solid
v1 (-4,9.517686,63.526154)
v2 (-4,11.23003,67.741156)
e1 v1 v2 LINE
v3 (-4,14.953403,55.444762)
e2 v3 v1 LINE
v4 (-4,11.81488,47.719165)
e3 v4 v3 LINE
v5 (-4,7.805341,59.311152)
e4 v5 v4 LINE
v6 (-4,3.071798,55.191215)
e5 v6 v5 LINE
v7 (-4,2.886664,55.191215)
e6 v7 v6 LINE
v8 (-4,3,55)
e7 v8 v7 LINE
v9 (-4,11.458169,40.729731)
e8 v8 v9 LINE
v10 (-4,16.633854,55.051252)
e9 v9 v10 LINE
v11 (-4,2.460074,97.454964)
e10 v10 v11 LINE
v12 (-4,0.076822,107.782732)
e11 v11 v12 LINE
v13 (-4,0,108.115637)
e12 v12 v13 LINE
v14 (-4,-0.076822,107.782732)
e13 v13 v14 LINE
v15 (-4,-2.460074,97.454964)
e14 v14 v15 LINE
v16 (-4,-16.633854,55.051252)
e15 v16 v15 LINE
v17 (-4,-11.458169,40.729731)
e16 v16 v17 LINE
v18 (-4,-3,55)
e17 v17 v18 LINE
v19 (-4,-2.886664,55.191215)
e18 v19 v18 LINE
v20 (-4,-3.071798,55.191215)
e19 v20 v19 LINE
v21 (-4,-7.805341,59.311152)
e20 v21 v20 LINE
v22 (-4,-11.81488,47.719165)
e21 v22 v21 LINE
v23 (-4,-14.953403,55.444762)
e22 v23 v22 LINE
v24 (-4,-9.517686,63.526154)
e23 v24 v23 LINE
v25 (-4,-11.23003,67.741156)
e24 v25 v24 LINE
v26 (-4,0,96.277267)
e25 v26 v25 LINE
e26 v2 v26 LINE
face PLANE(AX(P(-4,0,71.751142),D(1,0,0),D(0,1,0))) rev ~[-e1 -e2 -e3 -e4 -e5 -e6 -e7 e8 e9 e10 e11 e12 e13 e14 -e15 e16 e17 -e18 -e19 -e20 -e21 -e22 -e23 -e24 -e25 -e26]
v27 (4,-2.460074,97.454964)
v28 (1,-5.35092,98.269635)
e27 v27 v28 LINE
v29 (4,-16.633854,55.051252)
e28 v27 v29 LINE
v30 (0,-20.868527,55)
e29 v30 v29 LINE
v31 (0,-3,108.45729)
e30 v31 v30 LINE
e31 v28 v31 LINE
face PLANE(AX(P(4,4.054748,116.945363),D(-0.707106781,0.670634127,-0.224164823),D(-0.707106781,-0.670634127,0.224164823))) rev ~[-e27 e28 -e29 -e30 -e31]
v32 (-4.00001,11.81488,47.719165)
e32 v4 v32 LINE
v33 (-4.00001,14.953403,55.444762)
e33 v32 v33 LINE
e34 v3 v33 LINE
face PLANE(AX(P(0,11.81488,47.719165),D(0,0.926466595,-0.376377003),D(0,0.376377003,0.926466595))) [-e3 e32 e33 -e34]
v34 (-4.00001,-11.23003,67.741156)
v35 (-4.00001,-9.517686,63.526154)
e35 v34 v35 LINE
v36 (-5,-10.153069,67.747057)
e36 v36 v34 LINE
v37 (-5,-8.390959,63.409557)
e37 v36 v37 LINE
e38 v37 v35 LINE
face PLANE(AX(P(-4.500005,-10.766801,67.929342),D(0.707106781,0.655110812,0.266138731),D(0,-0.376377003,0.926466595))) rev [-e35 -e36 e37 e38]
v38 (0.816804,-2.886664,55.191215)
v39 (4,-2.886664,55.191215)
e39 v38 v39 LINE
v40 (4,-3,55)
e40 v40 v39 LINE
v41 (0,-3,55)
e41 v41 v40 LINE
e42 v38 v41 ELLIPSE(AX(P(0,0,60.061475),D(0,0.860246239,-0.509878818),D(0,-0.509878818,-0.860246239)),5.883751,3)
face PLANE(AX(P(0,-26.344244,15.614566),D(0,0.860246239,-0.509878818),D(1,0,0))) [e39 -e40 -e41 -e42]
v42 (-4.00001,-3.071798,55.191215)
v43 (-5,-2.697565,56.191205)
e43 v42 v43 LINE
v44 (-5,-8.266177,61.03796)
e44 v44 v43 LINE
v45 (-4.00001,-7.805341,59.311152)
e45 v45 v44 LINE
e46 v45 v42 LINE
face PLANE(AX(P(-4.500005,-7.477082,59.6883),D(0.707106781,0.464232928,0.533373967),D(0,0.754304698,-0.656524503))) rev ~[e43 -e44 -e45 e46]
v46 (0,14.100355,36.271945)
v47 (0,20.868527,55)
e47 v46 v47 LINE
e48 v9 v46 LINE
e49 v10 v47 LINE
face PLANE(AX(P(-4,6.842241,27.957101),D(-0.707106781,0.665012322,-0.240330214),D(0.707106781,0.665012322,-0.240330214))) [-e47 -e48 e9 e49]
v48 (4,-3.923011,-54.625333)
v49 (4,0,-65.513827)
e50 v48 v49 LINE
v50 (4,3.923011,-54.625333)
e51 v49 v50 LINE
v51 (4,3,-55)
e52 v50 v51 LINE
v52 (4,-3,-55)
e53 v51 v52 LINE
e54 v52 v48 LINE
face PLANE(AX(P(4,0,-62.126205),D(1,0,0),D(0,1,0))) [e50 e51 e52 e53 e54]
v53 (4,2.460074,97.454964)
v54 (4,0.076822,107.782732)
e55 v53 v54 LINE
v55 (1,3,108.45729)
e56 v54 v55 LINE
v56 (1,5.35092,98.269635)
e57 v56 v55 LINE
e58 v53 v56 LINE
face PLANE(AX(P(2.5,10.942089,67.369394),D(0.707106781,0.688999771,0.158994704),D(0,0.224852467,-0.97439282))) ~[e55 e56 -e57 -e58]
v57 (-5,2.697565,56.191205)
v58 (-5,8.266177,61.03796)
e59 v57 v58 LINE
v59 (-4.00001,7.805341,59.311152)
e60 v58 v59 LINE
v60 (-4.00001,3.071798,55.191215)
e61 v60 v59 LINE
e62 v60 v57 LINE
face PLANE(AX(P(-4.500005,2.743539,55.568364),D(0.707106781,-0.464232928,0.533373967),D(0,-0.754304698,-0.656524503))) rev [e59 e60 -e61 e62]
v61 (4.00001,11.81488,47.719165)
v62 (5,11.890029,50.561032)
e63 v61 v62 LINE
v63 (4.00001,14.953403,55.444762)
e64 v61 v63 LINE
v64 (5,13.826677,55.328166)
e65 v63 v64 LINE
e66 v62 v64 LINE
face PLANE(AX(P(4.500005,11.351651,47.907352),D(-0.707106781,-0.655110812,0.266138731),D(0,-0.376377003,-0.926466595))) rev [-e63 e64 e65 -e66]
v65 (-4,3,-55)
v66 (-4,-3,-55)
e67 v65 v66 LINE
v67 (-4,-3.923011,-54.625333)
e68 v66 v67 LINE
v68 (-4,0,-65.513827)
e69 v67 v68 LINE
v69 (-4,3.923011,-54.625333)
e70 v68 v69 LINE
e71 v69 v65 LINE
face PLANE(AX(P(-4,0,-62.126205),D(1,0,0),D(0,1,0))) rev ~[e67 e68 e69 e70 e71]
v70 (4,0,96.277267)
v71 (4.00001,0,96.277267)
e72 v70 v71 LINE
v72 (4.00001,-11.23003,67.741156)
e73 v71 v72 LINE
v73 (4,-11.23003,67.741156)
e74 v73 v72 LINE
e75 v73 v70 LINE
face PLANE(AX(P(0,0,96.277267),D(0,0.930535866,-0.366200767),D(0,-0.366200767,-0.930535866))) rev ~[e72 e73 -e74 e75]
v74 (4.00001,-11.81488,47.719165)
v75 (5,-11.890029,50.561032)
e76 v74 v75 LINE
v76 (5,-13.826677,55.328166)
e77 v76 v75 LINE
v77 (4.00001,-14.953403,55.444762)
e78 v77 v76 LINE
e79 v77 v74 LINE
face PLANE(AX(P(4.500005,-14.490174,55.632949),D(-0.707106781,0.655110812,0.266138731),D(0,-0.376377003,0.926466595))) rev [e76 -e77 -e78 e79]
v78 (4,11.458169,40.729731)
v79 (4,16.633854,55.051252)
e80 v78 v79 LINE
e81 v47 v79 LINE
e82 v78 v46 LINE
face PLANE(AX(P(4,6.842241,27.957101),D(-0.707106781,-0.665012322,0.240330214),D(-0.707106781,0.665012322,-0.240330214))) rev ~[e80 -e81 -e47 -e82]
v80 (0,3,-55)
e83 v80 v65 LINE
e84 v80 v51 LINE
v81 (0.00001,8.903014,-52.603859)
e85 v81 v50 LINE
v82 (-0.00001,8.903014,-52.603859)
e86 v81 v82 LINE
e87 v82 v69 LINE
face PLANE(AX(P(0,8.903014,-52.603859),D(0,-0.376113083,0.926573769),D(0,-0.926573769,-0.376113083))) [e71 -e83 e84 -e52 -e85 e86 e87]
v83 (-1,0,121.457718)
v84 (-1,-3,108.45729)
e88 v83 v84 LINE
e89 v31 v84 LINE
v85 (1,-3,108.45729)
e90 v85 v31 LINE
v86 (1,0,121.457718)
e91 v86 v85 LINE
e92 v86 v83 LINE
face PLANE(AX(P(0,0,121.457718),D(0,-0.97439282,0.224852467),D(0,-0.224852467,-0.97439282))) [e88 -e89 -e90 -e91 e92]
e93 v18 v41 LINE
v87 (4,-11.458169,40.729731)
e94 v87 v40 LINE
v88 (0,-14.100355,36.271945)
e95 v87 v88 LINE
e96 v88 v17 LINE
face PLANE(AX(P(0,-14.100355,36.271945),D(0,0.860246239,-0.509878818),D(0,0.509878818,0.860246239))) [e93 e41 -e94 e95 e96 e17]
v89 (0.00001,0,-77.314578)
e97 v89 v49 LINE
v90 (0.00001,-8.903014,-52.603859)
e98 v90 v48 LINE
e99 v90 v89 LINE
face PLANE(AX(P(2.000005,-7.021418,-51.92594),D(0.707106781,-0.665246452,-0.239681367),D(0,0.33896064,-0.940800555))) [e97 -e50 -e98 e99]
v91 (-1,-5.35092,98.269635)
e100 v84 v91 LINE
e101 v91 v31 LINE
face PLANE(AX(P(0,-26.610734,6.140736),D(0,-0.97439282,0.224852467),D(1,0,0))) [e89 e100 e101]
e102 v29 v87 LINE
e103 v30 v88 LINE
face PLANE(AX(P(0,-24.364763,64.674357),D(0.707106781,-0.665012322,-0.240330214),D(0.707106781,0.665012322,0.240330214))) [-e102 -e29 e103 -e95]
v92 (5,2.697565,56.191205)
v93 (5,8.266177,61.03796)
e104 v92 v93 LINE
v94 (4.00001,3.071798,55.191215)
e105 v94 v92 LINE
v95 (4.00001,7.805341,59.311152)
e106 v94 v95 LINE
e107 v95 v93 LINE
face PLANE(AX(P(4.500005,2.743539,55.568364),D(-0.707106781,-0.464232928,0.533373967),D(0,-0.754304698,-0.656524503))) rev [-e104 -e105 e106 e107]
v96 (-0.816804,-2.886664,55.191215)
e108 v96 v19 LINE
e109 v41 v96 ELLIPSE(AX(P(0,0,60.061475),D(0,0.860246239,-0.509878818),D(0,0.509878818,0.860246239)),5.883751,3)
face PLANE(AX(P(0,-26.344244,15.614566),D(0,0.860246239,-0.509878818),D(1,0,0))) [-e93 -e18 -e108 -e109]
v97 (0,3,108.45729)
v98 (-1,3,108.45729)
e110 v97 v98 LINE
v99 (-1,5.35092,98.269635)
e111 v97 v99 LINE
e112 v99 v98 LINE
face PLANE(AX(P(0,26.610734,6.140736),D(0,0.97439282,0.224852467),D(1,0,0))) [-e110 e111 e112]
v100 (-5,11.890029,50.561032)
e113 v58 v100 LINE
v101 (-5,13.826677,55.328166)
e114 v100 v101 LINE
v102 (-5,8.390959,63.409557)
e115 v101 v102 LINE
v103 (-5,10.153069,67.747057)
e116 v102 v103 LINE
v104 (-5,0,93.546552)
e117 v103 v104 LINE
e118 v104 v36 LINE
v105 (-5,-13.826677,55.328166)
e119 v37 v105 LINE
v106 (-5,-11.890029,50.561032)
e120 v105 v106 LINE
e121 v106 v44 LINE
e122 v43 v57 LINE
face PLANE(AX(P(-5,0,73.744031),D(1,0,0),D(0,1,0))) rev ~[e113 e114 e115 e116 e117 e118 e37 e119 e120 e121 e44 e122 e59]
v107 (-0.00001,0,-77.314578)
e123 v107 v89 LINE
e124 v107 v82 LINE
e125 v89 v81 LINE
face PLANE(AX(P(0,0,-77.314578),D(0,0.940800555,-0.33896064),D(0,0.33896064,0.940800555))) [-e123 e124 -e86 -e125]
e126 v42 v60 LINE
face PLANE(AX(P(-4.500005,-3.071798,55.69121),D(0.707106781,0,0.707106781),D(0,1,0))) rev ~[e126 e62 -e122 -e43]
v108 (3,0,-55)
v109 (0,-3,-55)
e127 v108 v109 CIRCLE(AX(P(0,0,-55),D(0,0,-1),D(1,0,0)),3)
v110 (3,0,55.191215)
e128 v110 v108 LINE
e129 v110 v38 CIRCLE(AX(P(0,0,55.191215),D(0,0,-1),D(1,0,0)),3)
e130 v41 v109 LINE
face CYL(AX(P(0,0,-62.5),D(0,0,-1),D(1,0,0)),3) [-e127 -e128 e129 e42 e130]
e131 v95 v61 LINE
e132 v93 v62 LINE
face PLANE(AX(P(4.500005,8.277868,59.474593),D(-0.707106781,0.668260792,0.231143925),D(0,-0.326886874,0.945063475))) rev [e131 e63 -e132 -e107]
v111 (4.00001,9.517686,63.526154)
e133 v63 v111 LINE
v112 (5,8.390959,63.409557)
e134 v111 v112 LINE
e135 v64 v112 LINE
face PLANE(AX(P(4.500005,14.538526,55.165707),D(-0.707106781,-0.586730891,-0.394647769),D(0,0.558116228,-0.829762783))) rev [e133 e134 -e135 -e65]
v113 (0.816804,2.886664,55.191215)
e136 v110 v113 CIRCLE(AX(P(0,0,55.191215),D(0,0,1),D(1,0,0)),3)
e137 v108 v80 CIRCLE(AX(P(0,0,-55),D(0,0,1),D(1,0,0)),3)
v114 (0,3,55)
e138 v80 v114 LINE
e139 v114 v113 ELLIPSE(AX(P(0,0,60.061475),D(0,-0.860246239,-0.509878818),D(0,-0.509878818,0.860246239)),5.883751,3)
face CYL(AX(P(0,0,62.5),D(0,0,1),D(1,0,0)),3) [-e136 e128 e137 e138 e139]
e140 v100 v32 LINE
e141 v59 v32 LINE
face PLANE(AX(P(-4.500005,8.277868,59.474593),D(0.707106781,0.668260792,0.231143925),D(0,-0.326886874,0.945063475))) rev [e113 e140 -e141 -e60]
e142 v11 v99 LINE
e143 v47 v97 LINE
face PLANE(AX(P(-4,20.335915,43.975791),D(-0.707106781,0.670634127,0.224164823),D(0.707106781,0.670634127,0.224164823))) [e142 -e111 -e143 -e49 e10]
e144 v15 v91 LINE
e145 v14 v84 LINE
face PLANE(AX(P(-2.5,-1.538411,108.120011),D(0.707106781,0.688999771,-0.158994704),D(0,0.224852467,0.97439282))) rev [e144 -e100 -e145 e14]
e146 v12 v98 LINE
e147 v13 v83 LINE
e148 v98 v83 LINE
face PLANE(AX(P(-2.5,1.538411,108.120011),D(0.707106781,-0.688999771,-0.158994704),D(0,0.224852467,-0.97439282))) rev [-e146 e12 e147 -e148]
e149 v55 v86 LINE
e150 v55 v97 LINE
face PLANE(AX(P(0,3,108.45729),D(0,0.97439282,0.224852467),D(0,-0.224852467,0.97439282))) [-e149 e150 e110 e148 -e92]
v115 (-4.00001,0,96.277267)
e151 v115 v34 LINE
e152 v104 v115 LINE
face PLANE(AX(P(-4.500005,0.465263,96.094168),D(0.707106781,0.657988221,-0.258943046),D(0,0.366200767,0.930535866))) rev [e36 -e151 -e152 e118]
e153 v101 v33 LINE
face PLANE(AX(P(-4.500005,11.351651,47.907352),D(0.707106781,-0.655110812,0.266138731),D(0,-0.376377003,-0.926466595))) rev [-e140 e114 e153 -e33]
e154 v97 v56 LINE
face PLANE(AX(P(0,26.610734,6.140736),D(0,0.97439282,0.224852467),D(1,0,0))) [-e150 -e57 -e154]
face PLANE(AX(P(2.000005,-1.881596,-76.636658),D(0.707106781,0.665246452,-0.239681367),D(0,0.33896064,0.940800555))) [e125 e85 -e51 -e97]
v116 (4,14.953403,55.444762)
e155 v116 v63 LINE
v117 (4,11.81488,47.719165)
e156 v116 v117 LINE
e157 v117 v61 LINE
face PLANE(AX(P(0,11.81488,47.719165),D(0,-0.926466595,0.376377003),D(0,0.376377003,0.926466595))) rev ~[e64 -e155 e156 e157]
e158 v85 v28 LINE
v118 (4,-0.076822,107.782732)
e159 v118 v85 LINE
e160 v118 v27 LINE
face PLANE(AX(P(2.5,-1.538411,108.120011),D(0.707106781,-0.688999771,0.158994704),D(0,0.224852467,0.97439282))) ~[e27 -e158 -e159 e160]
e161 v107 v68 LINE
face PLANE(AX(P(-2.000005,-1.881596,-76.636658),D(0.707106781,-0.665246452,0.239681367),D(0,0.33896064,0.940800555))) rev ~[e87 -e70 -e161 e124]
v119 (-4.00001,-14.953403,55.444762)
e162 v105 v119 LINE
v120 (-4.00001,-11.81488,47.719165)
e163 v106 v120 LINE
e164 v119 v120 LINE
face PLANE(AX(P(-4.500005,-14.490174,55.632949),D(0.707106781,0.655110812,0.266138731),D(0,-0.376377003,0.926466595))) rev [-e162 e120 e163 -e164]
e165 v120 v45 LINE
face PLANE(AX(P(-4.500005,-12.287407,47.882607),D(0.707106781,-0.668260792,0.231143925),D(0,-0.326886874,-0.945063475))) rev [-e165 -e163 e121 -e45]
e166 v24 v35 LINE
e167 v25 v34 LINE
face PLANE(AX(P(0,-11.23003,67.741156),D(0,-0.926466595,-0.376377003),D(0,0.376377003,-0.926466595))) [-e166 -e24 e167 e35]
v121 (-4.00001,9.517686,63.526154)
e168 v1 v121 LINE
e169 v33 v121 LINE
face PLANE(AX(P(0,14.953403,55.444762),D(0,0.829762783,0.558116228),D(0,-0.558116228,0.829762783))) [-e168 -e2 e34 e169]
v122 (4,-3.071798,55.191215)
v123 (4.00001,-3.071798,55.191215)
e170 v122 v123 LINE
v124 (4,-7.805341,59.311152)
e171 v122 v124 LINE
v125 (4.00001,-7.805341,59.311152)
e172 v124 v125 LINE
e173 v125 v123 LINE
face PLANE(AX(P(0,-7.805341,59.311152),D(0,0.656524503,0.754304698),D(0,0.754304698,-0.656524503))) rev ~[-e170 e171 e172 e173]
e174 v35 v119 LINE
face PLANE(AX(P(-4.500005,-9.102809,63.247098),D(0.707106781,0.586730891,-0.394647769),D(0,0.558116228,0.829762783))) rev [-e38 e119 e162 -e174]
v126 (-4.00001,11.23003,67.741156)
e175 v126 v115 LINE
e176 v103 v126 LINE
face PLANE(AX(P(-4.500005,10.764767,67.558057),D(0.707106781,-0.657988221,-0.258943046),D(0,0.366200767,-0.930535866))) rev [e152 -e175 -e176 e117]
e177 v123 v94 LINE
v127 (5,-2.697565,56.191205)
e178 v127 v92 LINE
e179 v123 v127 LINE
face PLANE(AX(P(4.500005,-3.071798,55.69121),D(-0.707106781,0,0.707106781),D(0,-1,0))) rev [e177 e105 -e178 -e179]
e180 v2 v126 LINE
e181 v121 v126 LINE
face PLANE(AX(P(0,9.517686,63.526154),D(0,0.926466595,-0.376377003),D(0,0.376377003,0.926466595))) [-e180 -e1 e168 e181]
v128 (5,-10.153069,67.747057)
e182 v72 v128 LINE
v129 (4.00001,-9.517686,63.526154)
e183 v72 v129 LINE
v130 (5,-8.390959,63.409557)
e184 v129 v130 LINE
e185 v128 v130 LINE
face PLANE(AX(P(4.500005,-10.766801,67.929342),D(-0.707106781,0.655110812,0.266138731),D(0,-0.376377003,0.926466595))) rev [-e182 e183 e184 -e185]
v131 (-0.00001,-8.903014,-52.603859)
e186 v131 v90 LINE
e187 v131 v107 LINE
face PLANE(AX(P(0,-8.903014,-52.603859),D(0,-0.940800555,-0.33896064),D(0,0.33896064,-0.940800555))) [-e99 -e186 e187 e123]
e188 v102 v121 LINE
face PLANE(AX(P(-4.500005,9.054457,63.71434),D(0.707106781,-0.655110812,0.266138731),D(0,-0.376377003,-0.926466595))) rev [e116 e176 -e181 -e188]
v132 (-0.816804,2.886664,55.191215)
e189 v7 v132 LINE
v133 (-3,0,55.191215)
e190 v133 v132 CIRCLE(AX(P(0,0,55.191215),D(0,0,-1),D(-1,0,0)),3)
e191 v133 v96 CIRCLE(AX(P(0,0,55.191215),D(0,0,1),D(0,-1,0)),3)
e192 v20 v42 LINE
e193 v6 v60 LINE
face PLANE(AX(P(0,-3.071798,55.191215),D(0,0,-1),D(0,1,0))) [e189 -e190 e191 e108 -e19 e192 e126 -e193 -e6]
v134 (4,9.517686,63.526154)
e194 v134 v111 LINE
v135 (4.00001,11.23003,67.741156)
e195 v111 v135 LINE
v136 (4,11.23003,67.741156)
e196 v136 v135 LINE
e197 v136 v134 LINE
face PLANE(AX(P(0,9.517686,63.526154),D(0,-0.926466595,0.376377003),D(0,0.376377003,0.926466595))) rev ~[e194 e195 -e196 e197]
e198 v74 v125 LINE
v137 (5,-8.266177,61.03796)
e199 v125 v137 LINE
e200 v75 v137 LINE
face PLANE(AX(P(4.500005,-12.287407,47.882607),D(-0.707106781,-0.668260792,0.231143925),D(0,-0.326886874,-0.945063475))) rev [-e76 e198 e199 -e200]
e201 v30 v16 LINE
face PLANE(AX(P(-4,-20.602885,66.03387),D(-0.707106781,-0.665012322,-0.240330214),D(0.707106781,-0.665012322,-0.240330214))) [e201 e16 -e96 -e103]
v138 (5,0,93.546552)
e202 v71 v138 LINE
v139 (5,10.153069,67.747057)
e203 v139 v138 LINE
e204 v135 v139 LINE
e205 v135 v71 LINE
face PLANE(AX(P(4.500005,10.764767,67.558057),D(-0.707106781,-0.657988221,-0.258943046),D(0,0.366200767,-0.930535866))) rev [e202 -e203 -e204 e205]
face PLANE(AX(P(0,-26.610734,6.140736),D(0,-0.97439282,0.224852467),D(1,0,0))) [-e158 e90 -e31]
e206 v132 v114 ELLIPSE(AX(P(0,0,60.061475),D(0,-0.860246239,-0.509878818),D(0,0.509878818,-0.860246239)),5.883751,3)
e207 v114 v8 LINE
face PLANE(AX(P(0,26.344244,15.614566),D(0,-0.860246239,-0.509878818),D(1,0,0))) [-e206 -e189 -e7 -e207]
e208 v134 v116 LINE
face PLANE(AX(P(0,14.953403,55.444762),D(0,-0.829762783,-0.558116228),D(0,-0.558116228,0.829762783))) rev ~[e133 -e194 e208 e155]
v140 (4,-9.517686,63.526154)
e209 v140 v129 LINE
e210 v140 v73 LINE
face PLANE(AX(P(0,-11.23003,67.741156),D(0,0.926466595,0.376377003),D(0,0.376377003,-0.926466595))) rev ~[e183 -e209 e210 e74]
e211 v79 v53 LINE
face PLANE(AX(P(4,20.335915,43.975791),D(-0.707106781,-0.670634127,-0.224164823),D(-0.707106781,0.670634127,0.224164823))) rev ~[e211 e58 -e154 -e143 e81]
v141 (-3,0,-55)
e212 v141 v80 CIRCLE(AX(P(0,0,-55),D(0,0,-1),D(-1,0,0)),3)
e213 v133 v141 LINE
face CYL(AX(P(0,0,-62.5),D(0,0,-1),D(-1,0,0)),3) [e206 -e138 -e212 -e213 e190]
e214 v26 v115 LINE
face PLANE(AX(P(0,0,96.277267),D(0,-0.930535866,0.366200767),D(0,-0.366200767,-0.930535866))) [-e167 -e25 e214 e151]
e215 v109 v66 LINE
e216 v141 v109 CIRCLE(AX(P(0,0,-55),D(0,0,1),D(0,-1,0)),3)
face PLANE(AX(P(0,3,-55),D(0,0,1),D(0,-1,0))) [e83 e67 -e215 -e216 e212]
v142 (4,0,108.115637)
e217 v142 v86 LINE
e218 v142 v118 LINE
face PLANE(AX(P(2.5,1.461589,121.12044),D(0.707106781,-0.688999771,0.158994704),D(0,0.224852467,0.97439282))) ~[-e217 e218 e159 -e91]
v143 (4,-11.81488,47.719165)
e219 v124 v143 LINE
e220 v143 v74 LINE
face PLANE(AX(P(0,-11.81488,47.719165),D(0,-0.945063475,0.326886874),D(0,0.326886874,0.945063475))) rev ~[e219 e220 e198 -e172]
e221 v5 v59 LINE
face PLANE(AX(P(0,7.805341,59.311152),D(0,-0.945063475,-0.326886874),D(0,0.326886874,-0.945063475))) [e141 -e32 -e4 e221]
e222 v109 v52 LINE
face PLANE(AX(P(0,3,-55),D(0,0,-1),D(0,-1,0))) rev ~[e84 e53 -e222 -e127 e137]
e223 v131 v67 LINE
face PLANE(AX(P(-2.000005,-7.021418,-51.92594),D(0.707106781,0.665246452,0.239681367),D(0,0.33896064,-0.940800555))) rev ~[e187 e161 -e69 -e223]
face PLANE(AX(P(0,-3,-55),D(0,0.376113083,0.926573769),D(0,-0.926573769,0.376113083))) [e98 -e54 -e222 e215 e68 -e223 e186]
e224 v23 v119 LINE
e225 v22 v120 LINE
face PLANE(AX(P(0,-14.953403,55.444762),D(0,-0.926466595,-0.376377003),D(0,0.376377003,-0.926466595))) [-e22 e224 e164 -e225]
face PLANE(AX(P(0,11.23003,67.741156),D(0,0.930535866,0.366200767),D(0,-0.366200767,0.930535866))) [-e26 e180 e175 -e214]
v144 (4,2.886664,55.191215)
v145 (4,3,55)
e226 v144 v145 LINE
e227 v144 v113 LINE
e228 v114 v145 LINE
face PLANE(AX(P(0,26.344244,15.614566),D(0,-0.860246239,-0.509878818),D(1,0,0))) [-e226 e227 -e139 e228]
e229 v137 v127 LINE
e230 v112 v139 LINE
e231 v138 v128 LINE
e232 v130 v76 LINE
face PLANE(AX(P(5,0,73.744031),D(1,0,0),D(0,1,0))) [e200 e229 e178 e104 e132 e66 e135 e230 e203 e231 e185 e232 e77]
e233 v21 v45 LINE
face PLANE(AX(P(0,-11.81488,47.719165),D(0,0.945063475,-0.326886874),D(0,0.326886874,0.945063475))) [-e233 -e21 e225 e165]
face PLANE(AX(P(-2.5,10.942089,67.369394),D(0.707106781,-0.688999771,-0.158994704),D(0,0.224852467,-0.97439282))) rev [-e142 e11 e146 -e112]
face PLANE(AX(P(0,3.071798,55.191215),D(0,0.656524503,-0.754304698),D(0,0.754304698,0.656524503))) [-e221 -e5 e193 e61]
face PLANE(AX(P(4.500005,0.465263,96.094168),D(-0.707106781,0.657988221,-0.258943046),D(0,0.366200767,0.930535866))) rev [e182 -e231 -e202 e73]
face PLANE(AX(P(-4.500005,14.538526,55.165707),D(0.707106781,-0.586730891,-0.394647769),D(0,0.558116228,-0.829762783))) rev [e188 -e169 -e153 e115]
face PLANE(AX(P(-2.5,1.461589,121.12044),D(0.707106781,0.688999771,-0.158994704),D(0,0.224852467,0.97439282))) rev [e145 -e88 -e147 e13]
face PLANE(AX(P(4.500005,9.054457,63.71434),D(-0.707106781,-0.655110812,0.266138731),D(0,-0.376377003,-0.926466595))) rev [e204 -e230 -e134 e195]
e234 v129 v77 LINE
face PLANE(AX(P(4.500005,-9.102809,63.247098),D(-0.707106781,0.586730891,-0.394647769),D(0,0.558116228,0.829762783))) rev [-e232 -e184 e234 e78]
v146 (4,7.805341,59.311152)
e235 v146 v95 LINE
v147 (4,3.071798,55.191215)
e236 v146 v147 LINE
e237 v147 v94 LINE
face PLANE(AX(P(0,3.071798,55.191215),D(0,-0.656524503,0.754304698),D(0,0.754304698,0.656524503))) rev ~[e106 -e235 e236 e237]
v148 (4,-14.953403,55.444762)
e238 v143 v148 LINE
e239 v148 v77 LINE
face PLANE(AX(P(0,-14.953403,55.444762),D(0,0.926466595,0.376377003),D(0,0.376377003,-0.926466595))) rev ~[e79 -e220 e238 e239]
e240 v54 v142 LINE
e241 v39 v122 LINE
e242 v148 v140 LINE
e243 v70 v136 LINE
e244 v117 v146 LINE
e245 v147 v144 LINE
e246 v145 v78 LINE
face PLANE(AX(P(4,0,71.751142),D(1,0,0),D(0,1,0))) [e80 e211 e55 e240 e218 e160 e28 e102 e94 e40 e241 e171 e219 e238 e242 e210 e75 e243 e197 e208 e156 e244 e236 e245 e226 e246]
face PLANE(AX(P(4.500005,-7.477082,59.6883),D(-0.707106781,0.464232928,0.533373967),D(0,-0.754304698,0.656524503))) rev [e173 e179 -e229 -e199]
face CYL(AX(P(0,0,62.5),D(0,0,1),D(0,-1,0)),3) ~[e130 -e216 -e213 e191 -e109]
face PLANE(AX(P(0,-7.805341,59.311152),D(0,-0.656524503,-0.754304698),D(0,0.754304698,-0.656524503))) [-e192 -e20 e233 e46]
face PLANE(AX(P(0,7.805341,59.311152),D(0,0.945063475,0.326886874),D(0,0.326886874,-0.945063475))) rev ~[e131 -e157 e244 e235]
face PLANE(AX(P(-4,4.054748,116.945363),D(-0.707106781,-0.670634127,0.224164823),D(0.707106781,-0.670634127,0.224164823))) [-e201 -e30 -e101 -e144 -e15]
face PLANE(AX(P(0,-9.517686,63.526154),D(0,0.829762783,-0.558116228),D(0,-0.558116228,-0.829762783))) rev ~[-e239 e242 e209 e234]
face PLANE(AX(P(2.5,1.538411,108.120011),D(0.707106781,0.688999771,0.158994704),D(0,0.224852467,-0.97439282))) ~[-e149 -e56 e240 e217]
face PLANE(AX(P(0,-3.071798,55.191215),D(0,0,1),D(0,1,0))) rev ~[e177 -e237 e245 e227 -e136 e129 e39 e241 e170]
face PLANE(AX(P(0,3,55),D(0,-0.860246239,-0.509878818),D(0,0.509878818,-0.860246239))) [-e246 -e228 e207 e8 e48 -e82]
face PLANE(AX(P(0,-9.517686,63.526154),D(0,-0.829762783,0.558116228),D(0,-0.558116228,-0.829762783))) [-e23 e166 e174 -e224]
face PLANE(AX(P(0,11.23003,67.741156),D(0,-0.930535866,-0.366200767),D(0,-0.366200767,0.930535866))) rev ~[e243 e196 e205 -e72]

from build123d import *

# Parameters (mm, degrees)
F1_DEPTH     = 3
F2_DEPTH     = 3
F4_DEPTH     = 4
F5_DEPTH     = 4
F6_T1_DEPTH  = 40.486982059
F6_T3_DEPTH  = 40.486982059
F6_T8_DEPTH  = 76.9380455506
F6_T13_DEPTH = 76.9380455506
F6_T18_DEPTH = 76.9380455506
F6_T23_DEPTH = 76.9380455506
F6_T28_DEPTH = 26.5734639037
F6_T35_DEPTH = 26.5734639037
F7_SIZE      = 3
F8_T4_DEPTH  = 125
F8_T10_DEPTH = 125
F8_T16_DEPTH = 125
F8_T22_DEPTH = 125
F9_DEPTH     = 5
F10_DEPTH    = 5
F11_SIZE     = 0.99999
F12_DEPTH    = 4
F13_DEPTH    = 4
F14_SIZE     = 3.99999


# Not quite as in the source:
# - a fillet or chamfer that OpenCascade refuses, or shapes differently, is made with other operations: its cross-section is extruded or revolved along the edge and cut away or added
# - a fillet or chamfer is up to 0.001 mm smaller than in the source, because OpenCascade refuses the exact size


with BuildPart() as f1:
    # F0 (on Right) → F1 (new body)
    with BuildSketch(Plane.YZ):
        Polygon((-3, 55), (-3, 0), (-3, -55), (3, -55), (3, 0), (3, 55), align=None)
    extrude(amount=F1_DEPTH)

    # F0 (on Right) → F2 (join)
    with BuildSketch(Plane.YZ):
        Polygon((-3, 55), (-3, 0), (-3, -55), (3, -55), (3, 0), (3, 55), align=None)
    extrude(amount=-F2_DEPTH)

    # F0 (on Right) → F4 (join)
    with BuildSketch(Plane.YZ):
        Polygon((-14.1003550962, 36.2719446421), (-3, 55), (3, 55), (14.1003550962, 36.2719446421), (20.8685267717, 55), (3, 108.4572896361), (0, 121.4577183127), (-3, 108.4572896361), (-20.8685267717, 55), align=None)
    extrude(amount=F4_DEPTH)

    # F3 (on face) + F0 (on Right) → F5 (join)
    with BuildSketch(Plane.YZ):
        Polygon((-7.805341389, 59.3111515045), (-3.0717977788, 55.1912151277), (3.0717977788, 55.1912151277), (7.805341389, 59.3111515045), (9.517685743, 63.5261535645), (11.2300300971, 67.7411556244), (0, 96.2772667408), (-11.2300300971, 67.7411556244), (-9.517685743, 63.5261535645), align=None)
        Polygon((9.517685743, 63.5261535645), (7.805341389, 59.3111515045), (11.814879576, 47.7191654262), (14.9534028023, 55.4447621107), align=None)
    with BuildSketch(Plane.YZ):
        Polygon((-14.1003550962, 36.2719446421), (-3, 55), (3, 55), (14.1003550962, 36.2719446421), (20.8685267717, 55), (3, 108.4572896361), (0, 121.4577183127), (-3, 108.4572896361), (-20.8685267717, 55), align=None)
    extrude(amount=-F5_DEPTH)

    # F6: chamfer of 4 on 10 edges, made by hand

    # F6_s2 → F6_t1 (cut)
    with BuildSketch(Plane(origin=(0, -23.4873916457, 64.9914322573), x_dir=(1, 0, 0), z_dir=(0, 0.3398782487, -0.9404694445))):
        Polygon((0, 0.932908104), (4, -3.067091896), (4, 0.932908104), align=None)
        Polygon((-4, -3.067091896), (0, 0.932908104), (-4, 0.932908104), align=None)
    extrude(amount=F6_T1_DEPTH, mode=Mode.SUBTRACT)

    # F6_s4 → F6_t3 (cut)
    with BuildSketch(Plane(origin=(0, 9.7267470895, 26.9146627299), x_dir=(1, 0, 0), z_dir=(0, 0.3398782487, 0.9404694445))):
        Polygon((4, -3.067091896), (0, 0.932908104), (4, 0.932908104), align=None)
        Polygon((-4, -3.067091896), (0, 0.932908104), (-4, 0.932908104), align=None)
    extrude(amount=F6_T3_DEPTH, mode=Mode.SUBTRACT)


with BuildPart() as f6_tool6:
    # F6_s7 → F6_t8 (new body)
    with BuildSketch(Plane(origin=(0, -11.1782341891, 33.4419345425), x_dir=(1, 0, 0), z_dir=(0, -0.3170169324, 0.9484198778))):
        Polygon((4, 33.2280568939), (0, 37.2280568939), (4, 37.2280568939), align=None)
    extrude(amount=F6_T8_DEPTH)

    split(bisect_by=Plane(origin=(0, 26.6107337931, 6.1407360761), x_dir=(1, 0, 0), z_dir=(0, 0.9743928202, 0.224852467)), keep=Keep.TOP)


with BuildPart() as f1_1:
    add(f1.part)

    # F6_t5: cut F6_tool6
    add(f6_tool6.part, mode=Mode.SUBTRACT)


with BuildPart() as f6_tool11:
    # F6_s12 → F6_t13 (new body)
    with BuildSketch(Plane(origin=(0, 35.5688973771, 106.4115062996), x_dir=(1, 0, 0), z_dir=(0, -0.3170169324, -0.9484198778))):
        Polygon((4, 33.2280568939), (0, 37.2280568939), (4, 37.2280568939), align=None)
    extrude(amount=F6_T13_DEPTH)

    split(bisect_by=Plane(origin=(0, -26.6107337931, 6.1407360761), x_dir=(1, 0, 0), z_dir=(0, -0.9743928202, 0.224852467)), keep=Keep.TOP)


with BuildPart() as f1_2:
    add(f1_1.part)

    # F6_t10: cut F6_tool11
    add(f6_tool11.part, mode=Mode.SUBTRACT)


with BuildPart() as f6_tool16:
    # F6_s17 → F6_t18 (new body)
    with BuildSketch(Plane(origin=(0, 35.5688973771, 106.4115062996), x_dir=(1, 0, 0), z_dir=(0, -0.3170169324, -0.9484198778))):
        Polygon((-4, 33.2280568939), (0, 37.2280568939), (-4, 37.2280568939), align=None)
    extrude(amount=F6_T18_DEPTH)

    split(bisect_by=Plane(origin=(0, -26.6107337931, 6.1407360761), x_dir=(1, 0, 0), z_dir=(0, -0.9743928202, 0.224852467)), keep=Keep.TOP)


with BuildPart() as f1_3:
    add(f1_2.part)

    # F6_t15: cut F6_tool16
    add(f6_tool16.part, mode=Mode.SUBTRACT)


with BuildPart() as f6_tool21:
    # F6_s22 → F6_t23 (new body)
    with BuildSketch(Plane(origin=(0, -11.1782341891, 33.4419345425), x_dir=(1, 0, 0), z_dir=(0, -0.3170169324, 0.9484198778))):
        Polygon((-4, 33.2280568939), (0, 37.2280568939), (-4, 37.2280568939), align=None)
    extrude(amount=F6_T23_DEPTH)

    split(bisect_by=Plane(origin=(0, 26.6107337931, 6.1407360761), x_dir=(1, 0, 0), z_dir=(0, 0.9743928202, 0.224852467)), keep=Keep.TOP)


with BuildPart() as f1_4:
    add(f1_3.part)

    # F6_t20: cut F6_tool21
    add(f6_tool21.part, mode=Mode.SUBTRACT)


with BuildPart() as f6_tool26:
    # F6_s27 → F6_t28 (new body)
    with BuildSketch(Plane.XZ.offset(13.2867319519)):
        Polygon((0, 55), (-4, 59), (-4, 55), align=None)
    extrude(amount=-F6_T28_DEPTH)

    split(bisect_by=Plane.YZ.offset(-3), keep=Keep.BOTTOM)

    split(bisect_by=Plane(origin=(0, 26.3442442024, 15.6145664778), x_dir=(1, 0, 0), z_dir=(0, -0.8602462388, -0.5098788176)), keep=Keep.TOP)

    split(bisect_by=Plane(origin=(0, -26.3442442024, 15.6145664778), x_dir=(1, 0, 0), z_dir=(0, 0.8602462388, -0.5098788176)), keep=Keep.TOP)


with BuildPart() as f1_5:
    add(f1_4.part)

    # F6_t25: cut F6_tool26
    add(f6_tool26.part, mode=Mode.SUBTRACT)


with BuildPart() as f6_tool33:
    # F6_s34 → F6_t35 (new body)
    with BuildSketch(Plane.XZ.offset(13.2867319519)):
        Polygon((4, 59), (0, 55), (4, 55), align=None)
    extrude(amount=-F6_T35_DEPTH)

    split(bisect_by=Plane.YZ.offset(3), keep=Keep.TOP)

    split(bisect_by=Plane(origin=(0, 26.3442442024, 15.6145664778), x_dir=(1, 0, 0), z_dir=(0, -0.8602462388, -0.5098788176)), keep=Keep.TOP)

    split(bisect_by=Plane(origin=(0, -26.3442442024, 15.6145664778), x_dir=(1, 0, 0), z_dir=(0, 0.8602462388, -0.5098788176)), keep=Keep.TOP)


with BuildPart() as f1_6:
    add(f1_5.part)

    # F6_t32: cut F6_tool33
    add(f6_tool33.part, mode=Mode.SUBTRACT)

    # F7
    f7_edges = [f1_6.edges().sort_by_distance(p)[0] for p in [
        (4, 6.201839, 94.582196),
        (4, -6.201839, 94.582196),
        (-4, -6.201839, 94.582196),
        (-4, 6.201839, 94.582196),
    ]]
    chamfer(f7_edges, length=F7_SIZE)

    # F8: fillet of radius 3 on 4 edges, made by hand


with BuildPart() as f8_tool2:
    # F8_s3 → F8_t4 (new body)
    with BuildSketch(Plane.XY.offset(62.5)):
        with BuildLine():
            ThreePointArc((0, -3), (-2.1213203436, -2.1213203436), (-3, 0))
            Line((-3, 0), (-3, -3))
            Line((-3, -3), (0, -3))
        make_face()
    extrude(amount=-F8_T4_DEPTH)

    split(bisect_by=Plane(origin=(0, -26.3442442024, 15.6145664778), x_dir=(1, 0, 0), z_dir=(0, 0.8602462388, -0.5098788176)), keep=Keep.TOP)

    split(bisect_by=Plane(origin=(27.5, 0, 27.5), x_dir=(0, 1, 0), z_dir=(-0.7071067812, 0, -0.7071067812)), keep=Keep.TOP)


with BuildPart() as f1_7:
    add(f1_6.part)

    # F8_t1: cut F8_tool2
    add(f8_tool2.part, mode=Mode.SUBTRACT)


with BuildPart() as f8_tool8:
    # F8_s9 → F8_t10 (new body)
    with BuildSketch(Plane.XY.offset(-62.5)):
        with BuildLine():
            ThreePointArc((-3, 0), (-2.1213203436, 2.1213203436), (0, 3))
            Line((0, 3), (-3, 3))
            Line((-3, 3), (-3, 0))
        make_face()
    extrude(amount=F8_T10_DEPTH)

    split(bisect_by=Plane(origin=(27.5, 0, 27.5), x_dir=(0, 1, 0), z_dir=(-0.7071067812, 0, -0.7071067812)), keep=Keep.TOP)

    split(bisect_by=Plane(origin=(0, 26.3442442024, 15.6145664778), x_dir=(1, 0, 0), z_dir=(0, -0.8602462388, -0.5098788176)), keep=Keep.TOP)


with BuildPart() as f1_8:
    add(f1_7.part)

    # F8_t7: cut F8_tool8
    add(f8_tool8.part, mode=Mode.SUBTRACT)


with BuildPart() as f8_tool14:
    # F8_s15 → F8_t16 (new body)
    with BuildSketch(Plane.XY.offset(62.5)):
        with BuildLine():
            ThreePointArc((3, 0), (2.1213203436, 2.1213203436), (0, 3))
            Line((0, 3), (3, 3))
            Line((3, 3), (3, 0))
        make_face()
    extrude(amount=-F8_T16_DEPTH)

    split(bisect_by=Plane(origin=(0, 26.3442442024, 15.6145664778), x_dir=(1, 0, 0), z_dir=(0, -0.8602462388, -0.5098788176)), keep=Keep.TOP)

    split(bisect_by=Plane(origin=(-27.5, 0, 27.5), x_dir=(0, 1, 0), z_dir=(0.7071067812, 0, -0.7071067812)), keep=Keep.TOP)


with BuildPart() as f1_9:
    add(f1_8.part)

    # F8_t13: cut F8_tool14
    add(f8_tool14.part, mode=Mode.SUBTRACT)


with BuildPart() as f8_tool20:
    # F8_s21 → F8_t22 (new body)
    with BuildSketch(Plane.XY.offset(-62.5)):
        with BuildLine():
            ThreePointArc((3, 0), (2.1213203436, -2.1213203436), (0, -3))
            Line((0, -3), (3, -3))
            Line((3, -3), (3, 0))
        make_face()
    extrude(amount=F8_T22_DEPTH)

    split(bisect_by=Plane(origin=(0, -26.3442442024, 15.6145664778), x_dir=(1, 0, 0), z_dir=(0, 0.8602462388, -0.5098788176)), keep=Keep.TOP)

    split(bisect_by=Plane(origin=(-27.5, 0, 27.5), x_dir=(0, 1, 0), z_dir=(0.7071067812, 0, -0.7071067812)), keep=Keep.TOP)


with BuildPart() as f1_10:
    add(f1_9.part)

    # F8_t19: cut F8_tool20
    add(f8_tool20.part, mode=Mode.SUBTRACT)

    # F3 (on face) → F9 (join)
    with BuildSketch(Plane.YZ):
        Polygon((-7.805341389, 59.3111515045), (-3.0717977788, 55.1912151277), (3.0717977788, 55.1912151277), (7.805341389, 59.3111515045), (9.517685743, 63.5261535645), (11.2300300971, 67.7411556244), (0, 96.2772667408), (-11.2300300971, 67.7411556244), (-9.517685743, 63.5261535645), align=None)
        Polygon((-11.814879576, 47.7191654262), (-7.805341389, 59.3111515045), (-9.517685743, 63.5261535645), (-14.9534028023, 55.4447621107), align=None)
        Polygon((9.517685743, 63.5261535645), (7.805341389, 59.3111515045), (11.814879576, 47.7191654262), (14.9534028023, 55.4447621107), align=None)
    extrude(amount=F9_DEPTH)

    # F3 (on face) → F10 (join)
    with BuildSketch(Plane.YZ):
        Polygon((-7.805341389, 59.3111515045), (-3.0717977788, 55.1912151277), (3.0717977788, 55.1912151277), (7.805341389, 59.3111515045), (9.517685743, 63.5261535645), (11.2300300971, 67.7411556244), (0, 96.2772667408), (-11.2300300971, 67.7411556244), (-9.517685743, 63.5261535645), align=None)
        Polygon((-11.814879576, 47.7191654262), (-7.805341389, 59.3111515045), (-9.517685743, 63.5261535645), (-14.9534028023, 55.4447621107), align=None)
        Polygon((9.517685743, 63.5261535645), (7.805341389, 59.3111515045), (11.814879576, 47.7191654262), (14.9534028023, 55.4447621107), align=None)
    extrude(amount=-F10_DEPTH)

    # F11 (size 1 in the source; OpenCascade refuses exactly that, so slightly less here)
    f11_edges = [f1_10.edges().sort_by_distance(p)[0] for p in [
        (5, -5.43857, 57.251183),
        (5, 0, 55.191215),
        (5, 5.43857, 57.251183),
        (5, 9.81011, 53.515158),
        (5, 13.384141, 51.581964),
        (5, 12.235544, 59.485458),
        (5, 10.373858, 65.633655),
        (5, 5.615015, 82.009211),
        (5, -5.615015, 82.009211),
        (5, -10.373858, 65.633655),
        (5, -12.235544, 59.485458),
        (5, -13.384141, 51.581964),
        (5, -9.81011, 53.515158),
        (-5, -5.615015, 82.009211),
        (-5, -5.43857, 57.251183),
        (-5, 0, 55.191215),
        (-5, 5.43857, 57.251183),
        (-5, 9.81011, 53.515158),
        (-5, 13.384141, 51.581964),
        (-5, 12.235544, 59.485458),
        (-5, 10.373858, 65.633655),
        (-5, 5.615015, 82.009211),
        (-5, -10.373858, 65.633655),
        (-5, -12.235544, 59.485458),
        (-5, -13.384141, 51.581964),
        (-5, -9.81011, 53.515158),
    ]]
    chamfer(f11_edges, length=F11_SIZE)

    # F0 (on Right) → F12 (join)
    with BuildSketch(Plane.YZ):
        Polygon((3, -55), (-3, -55), (-8.9030144736, -52.6038594544), (0, -77.3145779967), (8.9030144736, -52.6038594544), align=None)
    extrude(amount=F12_DEPTH)

    # F0 (on Right) → F13 (join)
    with BuildSketch(Plane.YZ):
        Polygon((3, -55), (-3, -55), (-8.9030144736, -52.6038594544), (0, -77.3145779967), (8.9030144736, -52.6038594544), align=None)
    extrude(amount=-F13_DEPTH)

    # F14 (size 4 in the source; OpenCascade refuses exactly that, so slightly less here)
    f14_edges = [f1_10.edges().sort_by_distance(p)[0] for p in [
        (-4, -4.451507, -64.959219),
        (-4, 4.451507, -64.959219),
        (4, -4.451507, -64.959219),
        (4, 4.451507, -64.959219),
    ]]
    chamfer(f14_edges, length=F14_SIZE)


solid = f1_10.part
